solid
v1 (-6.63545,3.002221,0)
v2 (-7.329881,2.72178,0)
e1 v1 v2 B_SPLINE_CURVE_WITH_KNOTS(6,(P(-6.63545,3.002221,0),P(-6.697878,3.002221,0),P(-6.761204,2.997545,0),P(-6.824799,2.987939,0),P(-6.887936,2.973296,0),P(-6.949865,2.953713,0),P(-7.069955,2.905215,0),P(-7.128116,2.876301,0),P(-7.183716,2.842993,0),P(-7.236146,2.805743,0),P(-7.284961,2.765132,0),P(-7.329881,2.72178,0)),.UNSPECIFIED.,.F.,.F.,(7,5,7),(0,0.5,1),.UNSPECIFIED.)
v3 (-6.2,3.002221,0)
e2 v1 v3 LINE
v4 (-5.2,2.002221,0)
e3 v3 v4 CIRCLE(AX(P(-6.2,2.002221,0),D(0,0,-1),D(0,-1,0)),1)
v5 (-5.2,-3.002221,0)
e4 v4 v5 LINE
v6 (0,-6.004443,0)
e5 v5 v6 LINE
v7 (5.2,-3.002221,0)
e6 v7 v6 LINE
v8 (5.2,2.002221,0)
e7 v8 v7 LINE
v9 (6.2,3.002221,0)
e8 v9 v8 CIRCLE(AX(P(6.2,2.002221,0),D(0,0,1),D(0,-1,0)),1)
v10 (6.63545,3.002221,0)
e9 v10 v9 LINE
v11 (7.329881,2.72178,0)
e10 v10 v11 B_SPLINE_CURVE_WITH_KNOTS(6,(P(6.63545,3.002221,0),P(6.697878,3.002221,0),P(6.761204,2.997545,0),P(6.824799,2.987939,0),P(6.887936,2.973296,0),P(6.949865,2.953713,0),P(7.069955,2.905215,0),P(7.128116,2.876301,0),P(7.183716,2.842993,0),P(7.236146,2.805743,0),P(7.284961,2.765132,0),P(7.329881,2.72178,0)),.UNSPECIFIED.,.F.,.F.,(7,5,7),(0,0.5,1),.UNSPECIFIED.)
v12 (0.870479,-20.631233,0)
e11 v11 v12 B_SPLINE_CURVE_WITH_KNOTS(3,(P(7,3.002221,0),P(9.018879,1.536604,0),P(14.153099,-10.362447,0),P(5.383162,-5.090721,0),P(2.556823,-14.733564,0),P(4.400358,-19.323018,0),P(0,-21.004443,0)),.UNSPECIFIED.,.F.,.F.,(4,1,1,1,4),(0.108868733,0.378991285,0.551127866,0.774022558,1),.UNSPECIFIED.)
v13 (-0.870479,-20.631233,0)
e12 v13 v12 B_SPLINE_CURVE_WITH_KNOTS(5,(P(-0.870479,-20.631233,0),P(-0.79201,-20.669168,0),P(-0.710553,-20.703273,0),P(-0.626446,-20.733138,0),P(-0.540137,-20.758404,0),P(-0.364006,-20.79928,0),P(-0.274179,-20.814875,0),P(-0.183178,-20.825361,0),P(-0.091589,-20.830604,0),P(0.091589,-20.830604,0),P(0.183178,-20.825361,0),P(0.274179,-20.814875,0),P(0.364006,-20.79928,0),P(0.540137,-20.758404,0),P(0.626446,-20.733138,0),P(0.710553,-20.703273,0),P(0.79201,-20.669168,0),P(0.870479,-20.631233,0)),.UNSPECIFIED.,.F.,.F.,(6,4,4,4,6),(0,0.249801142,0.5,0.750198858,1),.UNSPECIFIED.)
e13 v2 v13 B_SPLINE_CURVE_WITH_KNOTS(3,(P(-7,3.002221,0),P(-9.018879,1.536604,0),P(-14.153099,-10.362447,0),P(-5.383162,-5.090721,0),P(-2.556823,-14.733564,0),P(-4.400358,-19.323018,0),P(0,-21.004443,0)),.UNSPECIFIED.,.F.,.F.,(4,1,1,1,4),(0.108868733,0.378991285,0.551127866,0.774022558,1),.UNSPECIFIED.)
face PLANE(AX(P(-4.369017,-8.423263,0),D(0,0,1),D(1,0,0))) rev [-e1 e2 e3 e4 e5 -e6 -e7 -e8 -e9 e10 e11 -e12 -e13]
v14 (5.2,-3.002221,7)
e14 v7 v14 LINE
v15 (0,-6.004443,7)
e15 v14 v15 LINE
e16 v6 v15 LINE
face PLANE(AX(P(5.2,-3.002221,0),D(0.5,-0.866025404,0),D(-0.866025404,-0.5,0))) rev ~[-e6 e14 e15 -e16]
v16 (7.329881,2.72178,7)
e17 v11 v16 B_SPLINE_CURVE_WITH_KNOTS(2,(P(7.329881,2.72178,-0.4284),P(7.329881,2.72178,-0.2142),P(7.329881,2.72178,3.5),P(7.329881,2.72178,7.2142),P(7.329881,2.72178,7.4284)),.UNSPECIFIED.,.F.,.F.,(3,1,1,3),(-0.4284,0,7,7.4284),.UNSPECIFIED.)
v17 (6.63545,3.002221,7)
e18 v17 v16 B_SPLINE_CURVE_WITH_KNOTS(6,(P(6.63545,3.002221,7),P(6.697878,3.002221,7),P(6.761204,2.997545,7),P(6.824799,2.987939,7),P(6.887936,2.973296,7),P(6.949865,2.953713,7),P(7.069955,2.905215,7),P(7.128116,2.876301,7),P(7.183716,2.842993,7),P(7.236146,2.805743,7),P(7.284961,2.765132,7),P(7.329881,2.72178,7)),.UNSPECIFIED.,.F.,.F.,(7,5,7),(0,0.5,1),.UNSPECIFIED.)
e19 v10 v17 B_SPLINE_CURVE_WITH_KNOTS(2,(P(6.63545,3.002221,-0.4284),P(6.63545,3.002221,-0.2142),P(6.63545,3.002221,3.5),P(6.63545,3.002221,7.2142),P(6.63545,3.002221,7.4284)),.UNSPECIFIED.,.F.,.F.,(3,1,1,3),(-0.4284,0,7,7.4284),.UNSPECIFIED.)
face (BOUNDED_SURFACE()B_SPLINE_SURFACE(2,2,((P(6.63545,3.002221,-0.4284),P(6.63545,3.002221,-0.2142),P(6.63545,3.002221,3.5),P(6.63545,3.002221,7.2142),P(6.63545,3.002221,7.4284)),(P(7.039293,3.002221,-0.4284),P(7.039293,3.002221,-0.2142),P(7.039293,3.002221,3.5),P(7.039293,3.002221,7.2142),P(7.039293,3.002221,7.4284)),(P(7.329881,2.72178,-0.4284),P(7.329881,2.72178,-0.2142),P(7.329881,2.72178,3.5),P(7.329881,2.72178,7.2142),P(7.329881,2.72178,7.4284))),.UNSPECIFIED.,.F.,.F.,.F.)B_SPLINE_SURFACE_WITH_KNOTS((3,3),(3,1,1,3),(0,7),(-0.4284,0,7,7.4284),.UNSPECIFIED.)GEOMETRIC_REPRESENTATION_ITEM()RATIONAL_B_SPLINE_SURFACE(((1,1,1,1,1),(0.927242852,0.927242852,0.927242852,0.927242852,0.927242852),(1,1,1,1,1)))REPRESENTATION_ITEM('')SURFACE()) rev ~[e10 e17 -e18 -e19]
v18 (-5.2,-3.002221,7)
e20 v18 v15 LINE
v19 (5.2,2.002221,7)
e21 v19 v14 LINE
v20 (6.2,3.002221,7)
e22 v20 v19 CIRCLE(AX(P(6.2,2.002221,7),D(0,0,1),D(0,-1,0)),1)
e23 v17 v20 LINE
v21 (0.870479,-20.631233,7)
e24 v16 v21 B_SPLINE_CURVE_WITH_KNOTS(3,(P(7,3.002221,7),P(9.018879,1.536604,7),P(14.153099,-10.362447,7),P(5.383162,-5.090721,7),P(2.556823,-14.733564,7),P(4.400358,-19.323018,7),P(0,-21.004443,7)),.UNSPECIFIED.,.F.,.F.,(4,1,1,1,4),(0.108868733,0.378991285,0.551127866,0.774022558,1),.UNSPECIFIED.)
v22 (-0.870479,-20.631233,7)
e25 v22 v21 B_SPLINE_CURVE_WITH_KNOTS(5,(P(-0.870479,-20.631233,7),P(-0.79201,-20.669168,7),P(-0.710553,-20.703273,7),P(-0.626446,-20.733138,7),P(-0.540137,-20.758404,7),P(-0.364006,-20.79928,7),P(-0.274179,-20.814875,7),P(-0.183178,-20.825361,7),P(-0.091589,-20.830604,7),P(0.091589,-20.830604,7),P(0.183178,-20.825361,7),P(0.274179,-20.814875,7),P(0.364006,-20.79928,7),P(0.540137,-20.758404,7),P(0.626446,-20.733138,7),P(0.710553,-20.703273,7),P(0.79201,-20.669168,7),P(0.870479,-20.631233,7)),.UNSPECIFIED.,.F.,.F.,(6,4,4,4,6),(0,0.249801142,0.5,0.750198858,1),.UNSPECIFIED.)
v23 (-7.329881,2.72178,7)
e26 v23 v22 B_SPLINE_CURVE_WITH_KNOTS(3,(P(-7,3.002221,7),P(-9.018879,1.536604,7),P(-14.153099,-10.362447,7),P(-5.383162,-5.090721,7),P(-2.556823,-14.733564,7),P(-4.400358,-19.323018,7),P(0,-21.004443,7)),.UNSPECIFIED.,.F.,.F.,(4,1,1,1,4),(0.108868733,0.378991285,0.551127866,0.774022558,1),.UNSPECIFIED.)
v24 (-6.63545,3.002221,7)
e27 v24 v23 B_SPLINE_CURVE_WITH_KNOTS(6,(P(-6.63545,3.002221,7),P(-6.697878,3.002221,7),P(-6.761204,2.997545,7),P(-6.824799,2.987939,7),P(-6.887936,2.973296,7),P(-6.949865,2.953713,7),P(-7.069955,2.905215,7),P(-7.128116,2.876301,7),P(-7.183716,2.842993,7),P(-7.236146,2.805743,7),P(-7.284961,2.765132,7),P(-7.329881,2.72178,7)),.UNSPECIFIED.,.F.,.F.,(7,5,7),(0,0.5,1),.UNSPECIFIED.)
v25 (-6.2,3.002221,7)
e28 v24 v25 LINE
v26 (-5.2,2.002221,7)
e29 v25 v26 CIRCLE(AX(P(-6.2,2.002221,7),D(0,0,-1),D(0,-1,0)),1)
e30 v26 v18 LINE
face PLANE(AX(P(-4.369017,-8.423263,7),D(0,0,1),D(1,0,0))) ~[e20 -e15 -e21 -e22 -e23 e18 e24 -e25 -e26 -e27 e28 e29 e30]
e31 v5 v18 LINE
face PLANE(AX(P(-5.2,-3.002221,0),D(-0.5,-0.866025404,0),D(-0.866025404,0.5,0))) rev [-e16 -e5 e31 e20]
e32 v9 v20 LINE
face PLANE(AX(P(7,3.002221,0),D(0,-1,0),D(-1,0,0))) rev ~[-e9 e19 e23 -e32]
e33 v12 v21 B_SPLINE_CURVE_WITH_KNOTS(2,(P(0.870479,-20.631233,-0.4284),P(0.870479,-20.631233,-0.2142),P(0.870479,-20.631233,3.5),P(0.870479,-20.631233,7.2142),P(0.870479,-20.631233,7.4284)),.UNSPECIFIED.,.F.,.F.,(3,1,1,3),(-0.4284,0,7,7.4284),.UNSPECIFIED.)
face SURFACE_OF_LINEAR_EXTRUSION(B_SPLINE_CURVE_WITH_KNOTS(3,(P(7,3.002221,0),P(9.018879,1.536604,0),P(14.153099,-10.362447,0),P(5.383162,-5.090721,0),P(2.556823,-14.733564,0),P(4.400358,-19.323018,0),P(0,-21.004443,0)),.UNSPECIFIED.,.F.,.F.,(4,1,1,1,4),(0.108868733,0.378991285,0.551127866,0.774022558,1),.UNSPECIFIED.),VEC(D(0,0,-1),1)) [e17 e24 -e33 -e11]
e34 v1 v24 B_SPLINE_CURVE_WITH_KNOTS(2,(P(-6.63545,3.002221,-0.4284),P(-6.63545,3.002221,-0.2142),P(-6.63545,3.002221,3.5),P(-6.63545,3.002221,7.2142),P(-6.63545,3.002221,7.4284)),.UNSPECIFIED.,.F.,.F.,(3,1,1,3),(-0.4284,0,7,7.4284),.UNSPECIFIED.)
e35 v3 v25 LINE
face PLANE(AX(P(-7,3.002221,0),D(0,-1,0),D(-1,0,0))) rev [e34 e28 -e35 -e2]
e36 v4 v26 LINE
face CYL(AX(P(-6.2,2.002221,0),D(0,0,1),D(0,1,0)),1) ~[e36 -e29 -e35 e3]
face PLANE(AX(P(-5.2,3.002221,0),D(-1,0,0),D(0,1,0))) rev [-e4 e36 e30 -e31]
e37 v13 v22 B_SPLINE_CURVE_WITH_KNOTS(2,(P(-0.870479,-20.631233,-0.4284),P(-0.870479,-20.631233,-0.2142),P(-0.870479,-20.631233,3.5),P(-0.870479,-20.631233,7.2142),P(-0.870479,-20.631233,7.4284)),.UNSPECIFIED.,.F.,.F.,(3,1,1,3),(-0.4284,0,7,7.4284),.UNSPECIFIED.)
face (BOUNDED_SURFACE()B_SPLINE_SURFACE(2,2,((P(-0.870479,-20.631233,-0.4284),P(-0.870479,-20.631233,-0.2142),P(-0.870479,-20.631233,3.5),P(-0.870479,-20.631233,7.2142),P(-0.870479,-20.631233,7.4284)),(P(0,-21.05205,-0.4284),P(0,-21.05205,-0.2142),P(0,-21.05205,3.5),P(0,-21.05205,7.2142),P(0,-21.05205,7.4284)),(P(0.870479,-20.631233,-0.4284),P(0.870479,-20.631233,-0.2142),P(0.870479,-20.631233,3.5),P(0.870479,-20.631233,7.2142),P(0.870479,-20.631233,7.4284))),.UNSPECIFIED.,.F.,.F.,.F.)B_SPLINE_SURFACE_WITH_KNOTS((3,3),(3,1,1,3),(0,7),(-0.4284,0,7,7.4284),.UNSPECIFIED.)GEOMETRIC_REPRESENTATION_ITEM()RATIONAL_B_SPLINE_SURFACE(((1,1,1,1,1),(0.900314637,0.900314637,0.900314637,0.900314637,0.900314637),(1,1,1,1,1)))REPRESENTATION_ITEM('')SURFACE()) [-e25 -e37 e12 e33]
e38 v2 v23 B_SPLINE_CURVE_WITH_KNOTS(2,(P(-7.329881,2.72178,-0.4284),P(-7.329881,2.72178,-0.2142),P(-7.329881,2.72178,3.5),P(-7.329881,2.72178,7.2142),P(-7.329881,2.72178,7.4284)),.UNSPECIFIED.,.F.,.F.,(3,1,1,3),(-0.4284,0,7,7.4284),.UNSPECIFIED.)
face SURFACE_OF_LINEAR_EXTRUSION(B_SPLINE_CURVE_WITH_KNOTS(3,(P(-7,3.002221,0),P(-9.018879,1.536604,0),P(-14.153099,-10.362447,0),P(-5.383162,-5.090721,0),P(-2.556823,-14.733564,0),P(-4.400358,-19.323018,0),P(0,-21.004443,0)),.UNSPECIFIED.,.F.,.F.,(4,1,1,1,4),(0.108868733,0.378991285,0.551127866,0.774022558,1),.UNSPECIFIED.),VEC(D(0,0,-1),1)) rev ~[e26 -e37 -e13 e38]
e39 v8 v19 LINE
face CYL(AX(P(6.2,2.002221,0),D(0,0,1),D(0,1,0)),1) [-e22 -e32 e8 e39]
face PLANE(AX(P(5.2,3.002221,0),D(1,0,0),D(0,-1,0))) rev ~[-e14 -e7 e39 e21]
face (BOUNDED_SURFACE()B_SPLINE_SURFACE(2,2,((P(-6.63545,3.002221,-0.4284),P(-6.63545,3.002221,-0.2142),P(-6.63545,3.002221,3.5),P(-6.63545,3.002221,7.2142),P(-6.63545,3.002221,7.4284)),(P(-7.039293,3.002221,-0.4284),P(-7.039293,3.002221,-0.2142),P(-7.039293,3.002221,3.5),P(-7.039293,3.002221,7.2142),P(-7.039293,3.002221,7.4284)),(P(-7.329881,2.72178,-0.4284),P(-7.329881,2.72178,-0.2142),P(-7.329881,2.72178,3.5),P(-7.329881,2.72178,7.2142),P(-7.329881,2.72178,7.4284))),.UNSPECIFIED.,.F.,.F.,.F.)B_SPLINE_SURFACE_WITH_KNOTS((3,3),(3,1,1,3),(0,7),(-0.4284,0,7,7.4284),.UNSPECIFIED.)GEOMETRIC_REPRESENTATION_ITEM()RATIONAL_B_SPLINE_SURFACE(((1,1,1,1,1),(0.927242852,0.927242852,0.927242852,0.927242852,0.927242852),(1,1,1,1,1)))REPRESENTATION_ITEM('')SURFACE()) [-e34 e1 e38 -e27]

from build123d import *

# Parameters (mm, degrees)
F1_DEPTH = 7
F2_R     = 1
F4_R     = 2


with BuildPart() as f1:
    # F0 (on Top) → F1 (new body)
    with BuildSketch(Plane.XY):
        with BuildLine():
            Line((7, 3.0022213998), (5.2, 3.0022213998))
            Line((5.2, 3.0022213998), (5.2, -3.0022213998))
            Line((5.2, -3.0022213998), (0, -6.0044427996))
            Line((0, -6.0044427996), (0, -21.0044427996))
            add(Edge.make_bspline(
                [(7, 3.0022213998), (9.0188791452, 1.5366041561), (14.1530994004, -10.3624473952), (5.3831616493, -5.0907205572), (2.5568231001, -14.7335644159), (4.4003581826, -19.3230181565), (0, -21.0044427996)],
                knots=[0.1088687327, 0.1088687327, 0.1088687327, 0.1088687327, 0.3789912854, 0.5511278659, 0.7740225577, 1, 1, 1, 1], degree=3))
        make_face()
    extrude(amount=F1_DEPTH)

    # F2
    f2_edges = [f1.edges().sort_by_distance(p)[0] for p in [
        (5.2, 3.002221, 3.5),
        (7, 3.002221, 3.5),
    ]]
    fillet(f2_edges, radius=F2_R)

    # F3: F1 across plane


with BuildPart() as f1_1:
    add(f1.part)
    add(f1.part.mirror(Plane.YZ))

    # F4
    f4_edges = [f1_1.edges().sort_by_distance(p)[0] for p in [
        (0, -21.004443, 3.5),
    ]]
    fillet(f4_edges, radius=F4_R)


solid = f1_1.part
